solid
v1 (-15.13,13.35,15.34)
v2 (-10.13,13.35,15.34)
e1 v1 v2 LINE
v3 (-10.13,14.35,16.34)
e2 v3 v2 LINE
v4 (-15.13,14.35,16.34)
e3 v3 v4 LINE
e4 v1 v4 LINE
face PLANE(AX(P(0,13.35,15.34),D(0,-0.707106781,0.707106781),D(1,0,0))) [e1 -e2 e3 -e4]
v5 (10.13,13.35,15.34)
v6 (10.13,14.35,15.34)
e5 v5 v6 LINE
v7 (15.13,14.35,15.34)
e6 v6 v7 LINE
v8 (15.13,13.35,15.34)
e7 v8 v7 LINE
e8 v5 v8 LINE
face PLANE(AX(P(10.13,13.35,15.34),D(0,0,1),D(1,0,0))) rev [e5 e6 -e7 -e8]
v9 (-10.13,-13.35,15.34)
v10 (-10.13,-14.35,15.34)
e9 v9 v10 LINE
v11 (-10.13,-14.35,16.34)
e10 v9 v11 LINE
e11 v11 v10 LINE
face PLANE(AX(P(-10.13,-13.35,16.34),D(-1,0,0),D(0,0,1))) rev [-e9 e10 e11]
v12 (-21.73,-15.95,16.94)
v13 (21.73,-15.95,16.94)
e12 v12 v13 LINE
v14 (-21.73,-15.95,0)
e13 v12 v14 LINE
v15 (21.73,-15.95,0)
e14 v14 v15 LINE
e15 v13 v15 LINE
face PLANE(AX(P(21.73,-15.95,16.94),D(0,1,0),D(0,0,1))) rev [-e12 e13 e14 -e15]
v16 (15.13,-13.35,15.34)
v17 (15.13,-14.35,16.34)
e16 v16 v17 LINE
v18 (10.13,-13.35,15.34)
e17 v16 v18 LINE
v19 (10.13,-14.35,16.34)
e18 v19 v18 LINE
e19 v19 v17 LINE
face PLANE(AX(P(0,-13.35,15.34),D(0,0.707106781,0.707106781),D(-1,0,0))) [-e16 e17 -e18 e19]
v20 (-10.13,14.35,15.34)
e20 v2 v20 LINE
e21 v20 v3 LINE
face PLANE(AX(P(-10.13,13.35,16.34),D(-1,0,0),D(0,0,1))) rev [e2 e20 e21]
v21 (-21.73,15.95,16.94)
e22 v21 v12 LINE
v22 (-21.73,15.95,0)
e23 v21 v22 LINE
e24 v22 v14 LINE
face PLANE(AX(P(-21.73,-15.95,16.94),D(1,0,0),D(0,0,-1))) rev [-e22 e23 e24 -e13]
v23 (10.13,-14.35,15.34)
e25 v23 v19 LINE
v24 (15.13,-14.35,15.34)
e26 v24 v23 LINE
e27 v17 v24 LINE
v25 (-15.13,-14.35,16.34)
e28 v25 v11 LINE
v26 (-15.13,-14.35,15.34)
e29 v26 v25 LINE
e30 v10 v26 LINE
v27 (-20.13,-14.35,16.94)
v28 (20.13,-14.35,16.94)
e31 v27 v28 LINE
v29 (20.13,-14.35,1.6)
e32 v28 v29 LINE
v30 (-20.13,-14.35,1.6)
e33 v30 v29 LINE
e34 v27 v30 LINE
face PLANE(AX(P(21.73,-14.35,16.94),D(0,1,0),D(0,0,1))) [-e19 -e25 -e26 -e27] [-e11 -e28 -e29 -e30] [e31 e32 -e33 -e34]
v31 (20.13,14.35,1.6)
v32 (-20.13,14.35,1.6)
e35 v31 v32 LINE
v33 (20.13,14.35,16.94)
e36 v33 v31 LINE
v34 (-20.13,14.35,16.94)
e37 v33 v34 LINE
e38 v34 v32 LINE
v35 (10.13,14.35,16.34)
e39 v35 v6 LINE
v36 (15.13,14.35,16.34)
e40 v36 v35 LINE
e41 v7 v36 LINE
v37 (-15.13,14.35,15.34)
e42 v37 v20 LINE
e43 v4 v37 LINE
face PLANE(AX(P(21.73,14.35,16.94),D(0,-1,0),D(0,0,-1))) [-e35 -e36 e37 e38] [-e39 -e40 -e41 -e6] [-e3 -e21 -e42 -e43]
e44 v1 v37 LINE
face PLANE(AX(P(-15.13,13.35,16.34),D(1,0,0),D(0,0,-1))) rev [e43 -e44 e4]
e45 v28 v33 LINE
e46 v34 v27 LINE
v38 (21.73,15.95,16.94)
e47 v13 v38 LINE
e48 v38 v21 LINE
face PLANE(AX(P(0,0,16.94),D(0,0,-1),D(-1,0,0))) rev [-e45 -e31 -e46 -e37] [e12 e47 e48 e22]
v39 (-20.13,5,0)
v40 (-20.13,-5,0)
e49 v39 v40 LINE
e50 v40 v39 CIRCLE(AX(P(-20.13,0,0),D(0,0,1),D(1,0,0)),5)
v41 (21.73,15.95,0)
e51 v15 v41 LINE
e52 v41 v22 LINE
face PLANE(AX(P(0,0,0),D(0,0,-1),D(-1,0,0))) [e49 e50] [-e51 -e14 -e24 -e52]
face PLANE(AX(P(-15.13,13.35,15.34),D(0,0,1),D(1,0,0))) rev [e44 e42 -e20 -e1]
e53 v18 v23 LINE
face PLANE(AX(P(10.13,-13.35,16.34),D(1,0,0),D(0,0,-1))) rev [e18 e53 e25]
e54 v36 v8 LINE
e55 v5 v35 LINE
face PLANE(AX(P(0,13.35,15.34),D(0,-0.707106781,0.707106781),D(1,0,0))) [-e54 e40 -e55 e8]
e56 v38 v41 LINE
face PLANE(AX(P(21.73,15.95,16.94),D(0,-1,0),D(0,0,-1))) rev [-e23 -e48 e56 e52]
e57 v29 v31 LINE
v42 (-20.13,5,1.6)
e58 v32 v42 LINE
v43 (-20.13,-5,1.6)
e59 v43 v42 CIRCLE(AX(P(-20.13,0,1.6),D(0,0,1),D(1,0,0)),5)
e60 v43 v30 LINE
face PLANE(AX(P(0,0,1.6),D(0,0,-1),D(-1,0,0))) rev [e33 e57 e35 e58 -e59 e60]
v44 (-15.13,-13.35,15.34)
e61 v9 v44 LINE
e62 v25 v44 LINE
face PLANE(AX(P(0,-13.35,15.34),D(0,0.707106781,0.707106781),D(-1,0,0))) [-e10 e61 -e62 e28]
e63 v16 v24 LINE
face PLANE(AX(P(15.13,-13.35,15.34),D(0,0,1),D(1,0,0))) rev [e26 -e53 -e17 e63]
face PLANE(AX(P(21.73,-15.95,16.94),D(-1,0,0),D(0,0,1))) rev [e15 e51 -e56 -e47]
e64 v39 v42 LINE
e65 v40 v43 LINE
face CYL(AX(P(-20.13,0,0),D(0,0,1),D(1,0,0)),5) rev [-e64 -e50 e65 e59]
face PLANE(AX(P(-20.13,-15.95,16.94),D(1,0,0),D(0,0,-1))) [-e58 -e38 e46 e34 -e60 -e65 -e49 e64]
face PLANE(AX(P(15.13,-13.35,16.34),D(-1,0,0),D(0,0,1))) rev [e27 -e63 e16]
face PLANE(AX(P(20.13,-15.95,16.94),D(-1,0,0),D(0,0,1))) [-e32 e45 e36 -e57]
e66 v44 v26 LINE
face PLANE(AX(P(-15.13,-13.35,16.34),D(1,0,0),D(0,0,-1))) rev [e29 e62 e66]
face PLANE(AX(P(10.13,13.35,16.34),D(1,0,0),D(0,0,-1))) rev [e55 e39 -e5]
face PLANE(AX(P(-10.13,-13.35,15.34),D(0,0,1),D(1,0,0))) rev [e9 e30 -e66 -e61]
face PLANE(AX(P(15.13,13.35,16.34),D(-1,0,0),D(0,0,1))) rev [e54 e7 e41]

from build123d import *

# Parameters (mm, degrees)
SKETCH2_W           = 31.9
SKETCH2_H           = 43.46
BOSS_EXTRUDE1_DEPTH = 16.94
SHELL1_T            = -1.6
SKETCH3_W           = 5
SKETCH3_H           = 1
BOSS_EXTRUDE2_DEPTH = 1
SKETCH4_W           = 5
SKETCH4_H           = 1
BOSS_EXTRUDE3_DEPTH = 1
CHAMFER1_SIZE       = 1
CUT_EXTRUDE1_DEPTH  = 32.014690068


with BuildPart() as part:
    # Sketch2 → Boss-Extrude1 (new body)
    with BuildSketch(Plane(origin=(0, 0, 0), x_dir=(0, 1, 0), z_dir=(0, 0, 1))):
        Rectangle(SKETCH2_W, SKETCH2_H)
    extrude(amount=BOSS_EXTRUDE1_DEPTH)

    # Shell1
    shell1_openings = [part.faces().sort_by_distance(p)[0] for p in [
        (0, 0, 16.94),
    ]]
    offset(amount=SHELL1_T, openings=shell1_openings, kind=Kind.INTERSECTION)

    # Sketch3 → Boss-Extrude2 (add)
    with BuildSketch(Plane(origin=(0, -14.35, 0), x_dir=(-1, 0, 0), z_dir=(0, 1, 0))):
        with Locations((-12.63, 15.84)):
            Rectangle(SKETCH3_W, SKETCH3_H)
        with Locations((12.63, 15.84)):
            Rectangle(SKETCH3_W, SKETCH3_H)
    extrude(amount=BOSS_EXTRUDE2_DEPTH)

    # Sketch4 → Boss-Extrude3 (add)
    with BuildSketch(Plane.XZ.offset(-14.35)):
        with Locations((-12.63, 15.84)):
            Rectangle(SKETCH4_W, SKETCH4_H)
        with Locations((12.63, 15.84)):
            Rectangle(SKETCH4_W, SKETCH4_H)
    extrude(amount=BOSS_EXTRUDE3_DEPTH)

    # Chamfer1
    chamfer1_edges = [part.edges().sort_by_distance(p)[0] for p in [
        (-12.63, -13.35, 16.34),
        (12.63, -13.35, 16.34),
        (-12.63, 13.35, 16.34),
        (12.63, 13.35, 16.34),
    ]]
    chamfer(chamfer1_edges, length=CHAMFER1_SIZE - 0.0001)  # a hair under: the kernel refuses the full size

    # Sketch5 → Cut-Extrude1 (cut, through all)
    with BuildSketch(Plane.XY.offset(1.6)):
        with BuildLine():
            Line((-20.13, 5), (-20.13, -5))
            ThreePointArc((-20.13, -5), (-15.13, 0), (-20.13, 5))
        make_face()
    extrude(amount=-CUT_EXTRUDE1_DEPTH, mode=Mode.SUBTRACT)


solid = part.part
